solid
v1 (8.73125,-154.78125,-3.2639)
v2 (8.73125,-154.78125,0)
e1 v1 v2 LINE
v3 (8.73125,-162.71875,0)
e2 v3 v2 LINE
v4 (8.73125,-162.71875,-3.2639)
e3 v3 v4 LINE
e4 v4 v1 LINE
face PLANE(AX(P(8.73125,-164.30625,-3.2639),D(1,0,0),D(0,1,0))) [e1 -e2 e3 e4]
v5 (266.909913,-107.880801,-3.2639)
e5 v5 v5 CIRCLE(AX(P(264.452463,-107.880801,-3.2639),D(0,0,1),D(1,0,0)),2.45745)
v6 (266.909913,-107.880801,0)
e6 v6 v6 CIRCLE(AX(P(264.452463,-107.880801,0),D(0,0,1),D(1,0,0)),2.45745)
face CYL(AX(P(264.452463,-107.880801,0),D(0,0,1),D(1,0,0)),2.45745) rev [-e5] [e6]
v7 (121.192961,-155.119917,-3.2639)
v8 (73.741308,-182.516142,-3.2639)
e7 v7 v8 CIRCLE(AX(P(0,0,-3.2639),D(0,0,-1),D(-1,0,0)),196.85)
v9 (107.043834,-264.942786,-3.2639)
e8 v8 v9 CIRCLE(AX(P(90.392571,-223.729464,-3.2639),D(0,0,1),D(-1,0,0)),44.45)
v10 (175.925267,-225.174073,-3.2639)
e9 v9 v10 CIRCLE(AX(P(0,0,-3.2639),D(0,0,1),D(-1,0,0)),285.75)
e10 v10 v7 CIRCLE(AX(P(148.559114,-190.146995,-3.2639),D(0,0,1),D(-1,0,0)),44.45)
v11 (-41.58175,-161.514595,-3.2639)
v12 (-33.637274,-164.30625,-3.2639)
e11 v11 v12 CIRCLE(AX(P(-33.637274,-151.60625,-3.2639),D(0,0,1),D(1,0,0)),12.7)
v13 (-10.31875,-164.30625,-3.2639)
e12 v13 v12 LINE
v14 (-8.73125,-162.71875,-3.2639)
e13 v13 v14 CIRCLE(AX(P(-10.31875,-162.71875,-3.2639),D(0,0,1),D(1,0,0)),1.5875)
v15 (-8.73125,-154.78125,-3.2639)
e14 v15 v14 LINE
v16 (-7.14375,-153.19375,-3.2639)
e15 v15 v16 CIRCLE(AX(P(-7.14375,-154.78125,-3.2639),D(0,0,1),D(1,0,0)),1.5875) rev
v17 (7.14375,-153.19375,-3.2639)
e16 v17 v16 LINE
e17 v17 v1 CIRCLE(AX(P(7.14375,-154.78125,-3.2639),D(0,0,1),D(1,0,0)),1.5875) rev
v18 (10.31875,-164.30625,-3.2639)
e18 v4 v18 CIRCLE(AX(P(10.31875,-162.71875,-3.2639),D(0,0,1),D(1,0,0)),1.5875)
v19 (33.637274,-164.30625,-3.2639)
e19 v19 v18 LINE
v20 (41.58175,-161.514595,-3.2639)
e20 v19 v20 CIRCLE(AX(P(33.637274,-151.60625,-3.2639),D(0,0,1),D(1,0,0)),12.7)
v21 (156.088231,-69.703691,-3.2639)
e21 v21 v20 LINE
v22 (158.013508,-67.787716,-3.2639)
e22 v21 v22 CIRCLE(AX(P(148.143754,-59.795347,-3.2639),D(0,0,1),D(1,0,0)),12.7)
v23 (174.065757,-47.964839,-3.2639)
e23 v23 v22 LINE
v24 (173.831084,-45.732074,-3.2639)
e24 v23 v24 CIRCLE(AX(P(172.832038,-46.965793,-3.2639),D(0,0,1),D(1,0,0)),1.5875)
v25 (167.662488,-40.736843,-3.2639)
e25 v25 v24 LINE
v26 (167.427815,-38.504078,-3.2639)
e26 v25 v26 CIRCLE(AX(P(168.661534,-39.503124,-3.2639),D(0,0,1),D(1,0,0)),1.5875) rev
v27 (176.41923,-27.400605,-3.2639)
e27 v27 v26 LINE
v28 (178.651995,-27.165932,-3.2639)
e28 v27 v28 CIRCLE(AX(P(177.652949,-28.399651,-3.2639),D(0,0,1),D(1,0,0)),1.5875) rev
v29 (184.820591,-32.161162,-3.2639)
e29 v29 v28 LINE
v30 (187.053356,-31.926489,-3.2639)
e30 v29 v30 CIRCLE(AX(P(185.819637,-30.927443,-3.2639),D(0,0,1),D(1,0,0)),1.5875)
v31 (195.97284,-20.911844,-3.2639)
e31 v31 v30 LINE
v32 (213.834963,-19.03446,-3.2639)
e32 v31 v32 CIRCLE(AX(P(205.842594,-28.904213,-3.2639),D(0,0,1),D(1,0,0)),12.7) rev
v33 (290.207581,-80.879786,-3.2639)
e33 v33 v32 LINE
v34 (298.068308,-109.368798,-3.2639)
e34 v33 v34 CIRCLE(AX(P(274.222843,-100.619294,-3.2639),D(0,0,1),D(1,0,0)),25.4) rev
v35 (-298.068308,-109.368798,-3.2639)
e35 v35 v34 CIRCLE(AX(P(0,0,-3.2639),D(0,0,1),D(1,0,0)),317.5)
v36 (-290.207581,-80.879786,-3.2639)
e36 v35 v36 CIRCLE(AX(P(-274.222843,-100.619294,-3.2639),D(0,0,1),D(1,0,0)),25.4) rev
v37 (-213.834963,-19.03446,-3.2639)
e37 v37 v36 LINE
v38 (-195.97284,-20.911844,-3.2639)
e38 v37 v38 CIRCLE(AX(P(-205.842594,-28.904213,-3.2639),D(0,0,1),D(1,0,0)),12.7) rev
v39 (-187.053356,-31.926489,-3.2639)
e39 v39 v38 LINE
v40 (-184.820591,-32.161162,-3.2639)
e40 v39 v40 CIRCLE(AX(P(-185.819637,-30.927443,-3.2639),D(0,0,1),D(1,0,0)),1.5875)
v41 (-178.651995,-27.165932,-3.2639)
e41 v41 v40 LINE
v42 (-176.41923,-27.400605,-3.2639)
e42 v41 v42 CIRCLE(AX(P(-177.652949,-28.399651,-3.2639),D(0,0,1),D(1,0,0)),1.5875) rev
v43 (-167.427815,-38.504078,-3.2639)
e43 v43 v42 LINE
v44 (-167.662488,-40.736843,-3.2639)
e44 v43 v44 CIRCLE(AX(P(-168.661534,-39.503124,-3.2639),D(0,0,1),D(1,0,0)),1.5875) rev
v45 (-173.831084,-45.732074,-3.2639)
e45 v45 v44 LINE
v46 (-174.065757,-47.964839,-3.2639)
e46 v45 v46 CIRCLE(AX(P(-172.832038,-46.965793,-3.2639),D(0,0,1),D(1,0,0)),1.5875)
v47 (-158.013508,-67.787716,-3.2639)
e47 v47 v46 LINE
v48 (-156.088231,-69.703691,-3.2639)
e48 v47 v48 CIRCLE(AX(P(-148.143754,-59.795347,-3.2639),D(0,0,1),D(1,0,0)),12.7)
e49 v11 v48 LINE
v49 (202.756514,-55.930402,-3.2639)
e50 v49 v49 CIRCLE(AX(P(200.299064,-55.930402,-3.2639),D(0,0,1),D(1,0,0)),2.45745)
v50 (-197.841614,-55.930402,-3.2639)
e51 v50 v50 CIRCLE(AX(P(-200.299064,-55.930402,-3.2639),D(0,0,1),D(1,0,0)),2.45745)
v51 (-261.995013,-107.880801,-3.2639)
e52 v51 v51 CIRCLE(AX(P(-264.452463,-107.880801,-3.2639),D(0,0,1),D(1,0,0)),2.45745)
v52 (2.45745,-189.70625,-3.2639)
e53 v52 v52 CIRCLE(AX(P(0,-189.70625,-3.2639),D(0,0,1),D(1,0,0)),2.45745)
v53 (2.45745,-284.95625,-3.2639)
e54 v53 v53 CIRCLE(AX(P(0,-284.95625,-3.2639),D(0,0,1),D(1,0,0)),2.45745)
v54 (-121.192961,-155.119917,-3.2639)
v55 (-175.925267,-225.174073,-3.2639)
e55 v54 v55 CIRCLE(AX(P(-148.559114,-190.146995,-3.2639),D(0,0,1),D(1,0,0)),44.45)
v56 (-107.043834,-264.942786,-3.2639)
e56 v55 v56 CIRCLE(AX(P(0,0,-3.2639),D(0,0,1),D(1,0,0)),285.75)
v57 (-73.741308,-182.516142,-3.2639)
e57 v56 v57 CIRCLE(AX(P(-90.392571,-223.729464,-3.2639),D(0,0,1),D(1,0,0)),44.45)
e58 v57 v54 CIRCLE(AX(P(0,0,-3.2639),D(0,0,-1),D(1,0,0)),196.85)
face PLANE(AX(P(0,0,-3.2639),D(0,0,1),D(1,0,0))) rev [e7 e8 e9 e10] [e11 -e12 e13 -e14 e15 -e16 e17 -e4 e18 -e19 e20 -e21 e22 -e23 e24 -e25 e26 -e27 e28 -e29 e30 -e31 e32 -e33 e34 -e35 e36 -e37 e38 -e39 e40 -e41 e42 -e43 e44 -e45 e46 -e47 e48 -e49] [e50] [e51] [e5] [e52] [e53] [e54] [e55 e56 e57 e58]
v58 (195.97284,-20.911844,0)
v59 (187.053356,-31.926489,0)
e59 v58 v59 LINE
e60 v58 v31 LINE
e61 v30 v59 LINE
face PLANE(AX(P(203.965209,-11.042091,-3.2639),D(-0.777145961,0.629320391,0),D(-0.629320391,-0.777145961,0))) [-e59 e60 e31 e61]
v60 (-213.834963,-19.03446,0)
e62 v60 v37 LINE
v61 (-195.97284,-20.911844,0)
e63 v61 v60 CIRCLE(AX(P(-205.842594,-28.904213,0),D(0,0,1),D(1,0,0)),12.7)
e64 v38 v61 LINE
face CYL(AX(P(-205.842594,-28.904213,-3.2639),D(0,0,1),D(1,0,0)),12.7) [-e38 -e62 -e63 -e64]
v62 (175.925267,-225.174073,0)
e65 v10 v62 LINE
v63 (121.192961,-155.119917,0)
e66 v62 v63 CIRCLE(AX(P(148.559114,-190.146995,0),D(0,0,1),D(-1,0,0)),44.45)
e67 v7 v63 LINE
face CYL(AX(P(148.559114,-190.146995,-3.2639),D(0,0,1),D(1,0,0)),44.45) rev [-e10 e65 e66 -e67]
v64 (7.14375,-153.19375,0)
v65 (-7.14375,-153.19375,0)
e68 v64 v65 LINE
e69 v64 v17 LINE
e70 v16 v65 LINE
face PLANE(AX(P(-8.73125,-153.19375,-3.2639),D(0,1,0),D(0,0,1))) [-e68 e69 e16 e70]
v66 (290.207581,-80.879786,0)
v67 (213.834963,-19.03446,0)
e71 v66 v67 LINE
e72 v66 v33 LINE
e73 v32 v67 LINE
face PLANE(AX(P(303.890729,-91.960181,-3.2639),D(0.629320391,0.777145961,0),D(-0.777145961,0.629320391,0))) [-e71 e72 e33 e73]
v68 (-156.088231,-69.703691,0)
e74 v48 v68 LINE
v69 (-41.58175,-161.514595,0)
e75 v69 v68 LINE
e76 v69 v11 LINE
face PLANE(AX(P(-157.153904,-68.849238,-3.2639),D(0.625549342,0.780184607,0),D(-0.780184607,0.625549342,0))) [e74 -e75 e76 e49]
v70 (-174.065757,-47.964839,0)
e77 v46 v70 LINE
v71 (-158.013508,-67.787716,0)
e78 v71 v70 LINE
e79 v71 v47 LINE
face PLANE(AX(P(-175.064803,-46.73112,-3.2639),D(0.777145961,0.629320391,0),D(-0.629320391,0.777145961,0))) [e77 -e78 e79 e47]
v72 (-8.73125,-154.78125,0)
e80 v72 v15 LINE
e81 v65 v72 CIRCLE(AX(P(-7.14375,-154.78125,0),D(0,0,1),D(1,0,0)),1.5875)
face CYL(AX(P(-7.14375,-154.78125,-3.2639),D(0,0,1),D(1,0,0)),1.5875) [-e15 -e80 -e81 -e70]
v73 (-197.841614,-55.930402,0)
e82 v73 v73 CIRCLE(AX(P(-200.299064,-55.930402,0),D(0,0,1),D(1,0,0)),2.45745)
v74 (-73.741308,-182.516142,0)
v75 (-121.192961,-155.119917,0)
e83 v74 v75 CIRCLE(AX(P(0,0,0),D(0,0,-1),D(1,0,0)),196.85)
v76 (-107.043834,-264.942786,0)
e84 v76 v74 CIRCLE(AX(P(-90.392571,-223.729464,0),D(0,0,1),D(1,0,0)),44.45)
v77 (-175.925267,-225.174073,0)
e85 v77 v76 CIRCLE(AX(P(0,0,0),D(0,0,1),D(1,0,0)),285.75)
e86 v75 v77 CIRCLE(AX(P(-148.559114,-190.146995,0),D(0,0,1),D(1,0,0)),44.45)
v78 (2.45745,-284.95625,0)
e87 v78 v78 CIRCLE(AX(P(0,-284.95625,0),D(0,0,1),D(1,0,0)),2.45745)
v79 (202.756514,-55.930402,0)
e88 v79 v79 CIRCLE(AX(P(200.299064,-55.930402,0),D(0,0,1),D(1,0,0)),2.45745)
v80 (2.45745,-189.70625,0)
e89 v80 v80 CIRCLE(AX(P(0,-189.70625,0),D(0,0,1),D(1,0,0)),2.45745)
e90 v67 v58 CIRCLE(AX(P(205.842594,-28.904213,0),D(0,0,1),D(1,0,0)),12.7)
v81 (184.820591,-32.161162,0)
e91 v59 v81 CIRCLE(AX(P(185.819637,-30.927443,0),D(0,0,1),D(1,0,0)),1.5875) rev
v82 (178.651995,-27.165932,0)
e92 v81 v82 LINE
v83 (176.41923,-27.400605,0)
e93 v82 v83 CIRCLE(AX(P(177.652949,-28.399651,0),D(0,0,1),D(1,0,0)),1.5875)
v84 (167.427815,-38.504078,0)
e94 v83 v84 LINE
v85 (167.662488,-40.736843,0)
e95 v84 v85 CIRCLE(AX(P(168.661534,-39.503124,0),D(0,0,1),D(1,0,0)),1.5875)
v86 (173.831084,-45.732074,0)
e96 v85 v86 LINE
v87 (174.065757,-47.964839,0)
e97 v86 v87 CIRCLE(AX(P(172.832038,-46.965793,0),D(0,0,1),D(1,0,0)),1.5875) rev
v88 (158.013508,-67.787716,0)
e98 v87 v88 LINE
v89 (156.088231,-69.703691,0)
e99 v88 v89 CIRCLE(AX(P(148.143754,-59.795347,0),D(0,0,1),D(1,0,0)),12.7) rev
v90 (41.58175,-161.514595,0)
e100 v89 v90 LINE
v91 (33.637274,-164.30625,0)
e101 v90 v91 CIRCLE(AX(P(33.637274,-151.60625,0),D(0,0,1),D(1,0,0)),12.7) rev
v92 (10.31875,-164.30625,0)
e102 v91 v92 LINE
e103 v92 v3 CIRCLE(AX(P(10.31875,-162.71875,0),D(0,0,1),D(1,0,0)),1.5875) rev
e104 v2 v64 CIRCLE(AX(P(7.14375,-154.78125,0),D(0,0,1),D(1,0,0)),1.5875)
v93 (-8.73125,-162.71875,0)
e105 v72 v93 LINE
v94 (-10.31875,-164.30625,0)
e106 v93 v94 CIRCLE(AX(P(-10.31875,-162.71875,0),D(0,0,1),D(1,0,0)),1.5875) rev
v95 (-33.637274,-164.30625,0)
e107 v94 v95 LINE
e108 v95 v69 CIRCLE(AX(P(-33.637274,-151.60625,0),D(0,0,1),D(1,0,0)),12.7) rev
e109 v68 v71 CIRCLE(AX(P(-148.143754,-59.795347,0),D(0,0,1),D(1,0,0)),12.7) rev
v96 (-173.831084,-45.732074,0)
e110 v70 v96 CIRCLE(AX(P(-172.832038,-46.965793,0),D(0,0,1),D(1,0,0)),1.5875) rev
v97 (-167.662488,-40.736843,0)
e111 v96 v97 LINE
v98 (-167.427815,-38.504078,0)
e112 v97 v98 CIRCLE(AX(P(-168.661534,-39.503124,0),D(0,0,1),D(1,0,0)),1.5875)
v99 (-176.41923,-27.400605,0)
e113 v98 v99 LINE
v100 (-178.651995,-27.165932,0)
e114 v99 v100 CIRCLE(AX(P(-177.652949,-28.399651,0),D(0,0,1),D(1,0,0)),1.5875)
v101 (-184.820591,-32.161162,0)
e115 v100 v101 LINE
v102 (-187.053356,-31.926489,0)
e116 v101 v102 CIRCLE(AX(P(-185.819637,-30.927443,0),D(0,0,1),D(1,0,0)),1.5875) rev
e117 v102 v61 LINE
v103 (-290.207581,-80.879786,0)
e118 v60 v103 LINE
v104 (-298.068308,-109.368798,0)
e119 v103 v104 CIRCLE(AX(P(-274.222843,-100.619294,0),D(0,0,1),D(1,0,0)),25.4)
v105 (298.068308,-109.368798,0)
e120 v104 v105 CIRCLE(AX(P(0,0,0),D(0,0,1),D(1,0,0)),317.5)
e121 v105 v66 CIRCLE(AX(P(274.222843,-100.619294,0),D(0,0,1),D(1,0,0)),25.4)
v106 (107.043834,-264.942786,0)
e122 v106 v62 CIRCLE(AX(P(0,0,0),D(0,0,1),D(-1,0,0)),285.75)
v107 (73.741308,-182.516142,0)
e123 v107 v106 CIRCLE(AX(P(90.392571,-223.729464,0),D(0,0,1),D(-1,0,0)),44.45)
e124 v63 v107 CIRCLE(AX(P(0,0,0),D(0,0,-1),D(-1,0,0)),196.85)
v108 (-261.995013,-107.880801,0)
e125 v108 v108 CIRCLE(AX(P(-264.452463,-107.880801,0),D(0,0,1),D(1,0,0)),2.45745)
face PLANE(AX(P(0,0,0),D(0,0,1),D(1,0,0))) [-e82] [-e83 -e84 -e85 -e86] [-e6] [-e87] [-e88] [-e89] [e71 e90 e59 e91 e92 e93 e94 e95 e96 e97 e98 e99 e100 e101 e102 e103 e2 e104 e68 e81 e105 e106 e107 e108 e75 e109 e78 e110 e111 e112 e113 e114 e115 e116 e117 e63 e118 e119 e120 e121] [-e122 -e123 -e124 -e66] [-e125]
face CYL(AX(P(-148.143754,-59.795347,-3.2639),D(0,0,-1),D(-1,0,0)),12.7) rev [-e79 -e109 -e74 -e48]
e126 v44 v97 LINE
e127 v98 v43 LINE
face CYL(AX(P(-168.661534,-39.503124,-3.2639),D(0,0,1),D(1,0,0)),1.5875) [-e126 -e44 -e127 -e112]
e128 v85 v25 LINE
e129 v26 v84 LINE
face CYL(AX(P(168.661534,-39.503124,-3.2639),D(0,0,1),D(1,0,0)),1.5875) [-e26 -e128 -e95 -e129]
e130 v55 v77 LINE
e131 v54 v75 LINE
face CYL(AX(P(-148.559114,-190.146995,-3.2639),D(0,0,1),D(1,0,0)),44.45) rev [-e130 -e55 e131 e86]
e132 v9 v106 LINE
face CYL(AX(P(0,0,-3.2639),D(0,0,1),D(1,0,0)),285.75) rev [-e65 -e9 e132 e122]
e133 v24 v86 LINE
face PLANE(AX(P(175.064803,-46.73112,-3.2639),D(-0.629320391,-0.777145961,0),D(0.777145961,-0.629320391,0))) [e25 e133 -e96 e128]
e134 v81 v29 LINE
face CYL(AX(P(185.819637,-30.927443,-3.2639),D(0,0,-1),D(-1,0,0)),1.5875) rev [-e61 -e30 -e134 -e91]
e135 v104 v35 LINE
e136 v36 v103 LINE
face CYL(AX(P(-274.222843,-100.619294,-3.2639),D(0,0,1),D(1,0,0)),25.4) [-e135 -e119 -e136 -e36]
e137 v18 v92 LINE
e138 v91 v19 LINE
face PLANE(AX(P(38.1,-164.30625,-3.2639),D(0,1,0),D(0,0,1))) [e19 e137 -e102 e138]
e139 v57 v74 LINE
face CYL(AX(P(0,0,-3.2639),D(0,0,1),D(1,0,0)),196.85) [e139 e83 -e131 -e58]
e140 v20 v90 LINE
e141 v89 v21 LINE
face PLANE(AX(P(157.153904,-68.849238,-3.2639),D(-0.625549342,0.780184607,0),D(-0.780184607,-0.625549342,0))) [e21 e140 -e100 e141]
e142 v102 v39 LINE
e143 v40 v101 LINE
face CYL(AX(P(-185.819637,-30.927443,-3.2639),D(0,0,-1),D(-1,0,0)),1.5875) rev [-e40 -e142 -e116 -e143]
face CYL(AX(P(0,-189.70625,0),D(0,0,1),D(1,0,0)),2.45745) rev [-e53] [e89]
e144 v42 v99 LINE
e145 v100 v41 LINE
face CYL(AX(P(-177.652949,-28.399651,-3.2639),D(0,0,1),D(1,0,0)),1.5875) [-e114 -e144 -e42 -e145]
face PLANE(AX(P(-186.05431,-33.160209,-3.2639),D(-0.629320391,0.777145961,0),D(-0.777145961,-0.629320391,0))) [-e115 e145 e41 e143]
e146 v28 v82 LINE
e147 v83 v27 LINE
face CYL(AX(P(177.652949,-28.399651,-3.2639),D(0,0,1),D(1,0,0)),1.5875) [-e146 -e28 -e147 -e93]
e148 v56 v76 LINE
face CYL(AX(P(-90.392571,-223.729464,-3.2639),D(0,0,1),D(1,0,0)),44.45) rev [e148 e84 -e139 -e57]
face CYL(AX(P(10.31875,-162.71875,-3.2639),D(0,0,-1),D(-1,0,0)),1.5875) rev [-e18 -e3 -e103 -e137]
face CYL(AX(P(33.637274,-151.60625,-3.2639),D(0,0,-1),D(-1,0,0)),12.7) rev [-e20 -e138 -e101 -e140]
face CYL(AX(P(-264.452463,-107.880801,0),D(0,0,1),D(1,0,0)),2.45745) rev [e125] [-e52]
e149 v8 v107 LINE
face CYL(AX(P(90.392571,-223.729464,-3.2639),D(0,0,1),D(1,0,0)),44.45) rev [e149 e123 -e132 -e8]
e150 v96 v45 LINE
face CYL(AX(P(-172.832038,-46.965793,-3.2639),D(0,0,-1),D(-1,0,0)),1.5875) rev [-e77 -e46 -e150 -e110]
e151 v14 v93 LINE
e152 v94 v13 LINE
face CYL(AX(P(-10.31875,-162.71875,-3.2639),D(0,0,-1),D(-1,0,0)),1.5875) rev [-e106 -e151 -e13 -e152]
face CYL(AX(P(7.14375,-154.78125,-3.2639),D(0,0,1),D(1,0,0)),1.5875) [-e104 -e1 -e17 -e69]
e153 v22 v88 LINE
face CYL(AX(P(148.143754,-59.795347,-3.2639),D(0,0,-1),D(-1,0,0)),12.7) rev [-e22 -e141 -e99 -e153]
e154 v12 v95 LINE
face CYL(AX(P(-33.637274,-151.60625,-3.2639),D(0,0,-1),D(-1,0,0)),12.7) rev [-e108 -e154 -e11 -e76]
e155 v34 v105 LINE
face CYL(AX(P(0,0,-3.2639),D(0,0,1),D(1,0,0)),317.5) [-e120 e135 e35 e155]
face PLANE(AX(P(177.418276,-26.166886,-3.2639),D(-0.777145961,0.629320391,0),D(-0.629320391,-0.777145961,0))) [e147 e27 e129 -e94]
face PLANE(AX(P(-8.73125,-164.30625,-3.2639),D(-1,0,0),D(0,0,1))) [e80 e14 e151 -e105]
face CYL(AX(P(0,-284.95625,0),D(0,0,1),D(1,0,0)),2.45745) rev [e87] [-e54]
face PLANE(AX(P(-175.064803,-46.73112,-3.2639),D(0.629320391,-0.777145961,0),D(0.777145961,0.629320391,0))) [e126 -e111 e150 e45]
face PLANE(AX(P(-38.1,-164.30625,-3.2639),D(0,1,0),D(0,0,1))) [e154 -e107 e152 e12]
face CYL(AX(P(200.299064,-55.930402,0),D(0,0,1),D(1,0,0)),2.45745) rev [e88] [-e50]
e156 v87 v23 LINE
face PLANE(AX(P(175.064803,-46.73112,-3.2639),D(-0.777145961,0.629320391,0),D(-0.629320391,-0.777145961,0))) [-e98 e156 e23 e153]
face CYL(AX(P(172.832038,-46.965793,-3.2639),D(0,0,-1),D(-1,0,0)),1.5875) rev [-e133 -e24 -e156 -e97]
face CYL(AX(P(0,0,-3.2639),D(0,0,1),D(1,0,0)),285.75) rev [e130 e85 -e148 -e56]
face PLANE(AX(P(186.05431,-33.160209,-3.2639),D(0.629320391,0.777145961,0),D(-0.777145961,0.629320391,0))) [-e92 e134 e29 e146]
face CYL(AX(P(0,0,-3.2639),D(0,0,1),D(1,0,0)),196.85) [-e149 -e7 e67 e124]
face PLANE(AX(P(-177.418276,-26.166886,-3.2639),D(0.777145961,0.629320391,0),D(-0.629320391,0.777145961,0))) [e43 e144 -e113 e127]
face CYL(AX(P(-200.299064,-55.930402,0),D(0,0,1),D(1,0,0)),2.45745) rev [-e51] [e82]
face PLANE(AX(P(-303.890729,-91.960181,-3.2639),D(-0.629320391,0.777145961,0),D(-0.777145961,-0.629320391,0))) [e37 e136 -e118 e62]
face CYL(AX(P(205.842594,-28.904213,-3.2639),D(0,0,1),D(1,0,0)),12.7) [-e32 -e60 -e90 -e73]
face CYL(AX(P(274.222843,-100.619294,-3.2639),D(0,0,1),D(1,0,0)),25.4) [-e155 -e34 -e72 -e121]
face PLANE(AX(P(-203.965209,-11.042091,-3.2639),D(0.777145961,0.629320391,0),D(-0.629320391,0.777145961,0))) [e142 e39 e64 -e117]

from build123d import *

# Parameters (mm, degrees)
BASE_FLANGE1_DEPTH           = 3.2639
F_10_0_1935_DIAMETER_HOLE1_D = 4.9149
FILLET1_R                    = 1.5875
FILLET2_R                    = 12.7
FILLET3_R                    = 25.4


# Sheet-metal steps are written as plain solids
with BuildPart() as part:
    # Sketch1 → Base-Flange1 (new body)
    with BuildSketch(Plane.XY):
        with BuildLine():
            Line((-175.064802987, -46.731119967), (-166.42876849, -39.737797122))
            Line((-166.42876849, -39.737797122), (-177.418275819, -26.16688577))
            Line((-177.418275819, -26.16688577), (-186.054310315, -33.160208616))
            Line((-186.054310315, -33.160208616), (-203.965209169, -11.04209055))
            Line((-203.965209169, -11.04209055), (-303.890728914, -91.960180949))
            ThreePointArc((-303.890728914, -91.960180949), (0, -317.5), (303.890728914, -91.960180949))
            Line((303.890728914, -91.960180949), (203.965209169, -11.04209055))
            Line((203.965209169, -11.04209055), (186.054310315, -33.160208616))
            Line((186.054310315, -33.160208616), (177.418275819, -26.16688577))
            Line((177.418275819, -26.16688577), (166.42876849, -39.737797122))
            Line((166.42876849, -39.737797122), (175.064802987, -46.731119967))
            Line((175.064802987, -46.731119967), (157.153904133, -68.849238033))
            Line((157.153904133, -68.849238033), (38.1, -164.30625))
            Line((38.1, -164.30625), (8.73125, -164.30625))
            Line((8.73125, -164.30625), (8.73125, -153.19375))
            Line((8.73125, -153.19375), (-8.73125, -153.19375))
            Line((-8.73125, -153.19375), (-8.73125, -164.30625))
            Line((-8.73125, -164.30625), (-38.1, -164.30625))
            Line((-38.1, -164.30625), (-157.153904133, -68.849238033))
            Line((-157.153904133, -68.849238033), (-175.064802987, -46.731119967))
        make_face()
        with BuildLine():
            ThreePointArc((-175.925266574, -225.174072843), (-142.875, -247.466759131), (-107.043834069, -264.942786442))
            ThreePointArc((-107.043834069, -264.942786442), (-49.179248656, -240.380727184), (-73.741307914, -182.516141771))
            ThreePointArc((-73.741307914, -182.516141771), (-98.425, -170.477100735), (-121.192961418, -155.119916847))
            ThreePointArc((-121.192961418, -155.119916847), (-183.586191994, -162.780842267), (-175.925266574, -225.174072843))
        make_face(mode=Mode.SUBTRACT)
        with BuildLine():
            ThreePointArc((175.925266574, -225.174072843), (142.875, -247.466759131), (107.043834069, -264.942786442))
            ThreePointArc((107.043834069, -264.942786442), (49.179248656, -240.380727184), (73.741307914, -182.516141771))
            ThreePointArc((73.741307914, -182.516141771), (98.425, -170.477100735), (121.192961418, -155.119916847))
            ThreePointArc((121.192961418, -155.119916847), (183.586191994, -162.780842267), (175.925266574, -225.174072843))
        make_face(mode=Mode.SUBTRACT)
    extrude(amount=-BASE_FLANGE1_DEPTH)

    # #10 (0.1935) Diameter Hole1 (through all)
    with Locations(Plane.XY):
        with Locations((-200.299064072, -55.930402224), (-264.45246319, -107.880800505), (0, -189.70625), (0, -284.95625), (200.299064072, -55.930402224), (264.45246319, -107.880800505)):
            Hole(F_10_0_1935_DIAMETER_HOLE1_D / 2)

    # Fillet1
    fillet1_edges = [part.edges().sort_by_distance(p)[0] for p in [
        (-8.73125, -164.30625, -1.63195),
        (-8.73125, -153.19375, -1.63195),
        (8.73125, -153.19375, -1.63195),
        (8.73125, -164.30625, -1.63195),
        (175.064802987, -46.731119967, -1.63195),
        (166.42876849, -39.737797122, -1.63195),
        (177.418275819, -26.16688577, -1.63195),
        (186.054310315, -33.160208616, -1.63195),
        (-186.054310315, -33.160208616, -1.63195),
        (-177.418275819, -26.16688577, -1.63195),
        (-166.42876849, -39.737797122, -1.63195),
        (-175.064802987, -46.731119967, -1.63195),
    ]]
    fillet(fillet1_edges, radius=FILLET1_R)

    # Fillet2
    fillet2_edges = [part.edges().sort_by_distance(p)[0] for p in [
        (-38.1, -164.30625, -1.63195),
        (38.1, -164.30625, -1.63195),
        (157.153904133, -68.849238033, -1.63195),
        (203.965209169, -11.04209055, -1.63195),
        (-203.965209169, -11.04209055, -1.63195),
        (-157.153904133, -68.849238033, -1.63195),
    ]]
    fillet(fillet2_edges, radius=FILLET2_R)

    # Fillet3
    fillet3_edges = [part.edges().sort_by_distance(p)[0] for p in [
        (303.890728914, -91.960180949, -1.63195),
        (-303.890728914, -91.960180949, -1.63195),
    ]]
    fillet(fillet3_edges, radius=FILLET3_R)


solid = part.part
